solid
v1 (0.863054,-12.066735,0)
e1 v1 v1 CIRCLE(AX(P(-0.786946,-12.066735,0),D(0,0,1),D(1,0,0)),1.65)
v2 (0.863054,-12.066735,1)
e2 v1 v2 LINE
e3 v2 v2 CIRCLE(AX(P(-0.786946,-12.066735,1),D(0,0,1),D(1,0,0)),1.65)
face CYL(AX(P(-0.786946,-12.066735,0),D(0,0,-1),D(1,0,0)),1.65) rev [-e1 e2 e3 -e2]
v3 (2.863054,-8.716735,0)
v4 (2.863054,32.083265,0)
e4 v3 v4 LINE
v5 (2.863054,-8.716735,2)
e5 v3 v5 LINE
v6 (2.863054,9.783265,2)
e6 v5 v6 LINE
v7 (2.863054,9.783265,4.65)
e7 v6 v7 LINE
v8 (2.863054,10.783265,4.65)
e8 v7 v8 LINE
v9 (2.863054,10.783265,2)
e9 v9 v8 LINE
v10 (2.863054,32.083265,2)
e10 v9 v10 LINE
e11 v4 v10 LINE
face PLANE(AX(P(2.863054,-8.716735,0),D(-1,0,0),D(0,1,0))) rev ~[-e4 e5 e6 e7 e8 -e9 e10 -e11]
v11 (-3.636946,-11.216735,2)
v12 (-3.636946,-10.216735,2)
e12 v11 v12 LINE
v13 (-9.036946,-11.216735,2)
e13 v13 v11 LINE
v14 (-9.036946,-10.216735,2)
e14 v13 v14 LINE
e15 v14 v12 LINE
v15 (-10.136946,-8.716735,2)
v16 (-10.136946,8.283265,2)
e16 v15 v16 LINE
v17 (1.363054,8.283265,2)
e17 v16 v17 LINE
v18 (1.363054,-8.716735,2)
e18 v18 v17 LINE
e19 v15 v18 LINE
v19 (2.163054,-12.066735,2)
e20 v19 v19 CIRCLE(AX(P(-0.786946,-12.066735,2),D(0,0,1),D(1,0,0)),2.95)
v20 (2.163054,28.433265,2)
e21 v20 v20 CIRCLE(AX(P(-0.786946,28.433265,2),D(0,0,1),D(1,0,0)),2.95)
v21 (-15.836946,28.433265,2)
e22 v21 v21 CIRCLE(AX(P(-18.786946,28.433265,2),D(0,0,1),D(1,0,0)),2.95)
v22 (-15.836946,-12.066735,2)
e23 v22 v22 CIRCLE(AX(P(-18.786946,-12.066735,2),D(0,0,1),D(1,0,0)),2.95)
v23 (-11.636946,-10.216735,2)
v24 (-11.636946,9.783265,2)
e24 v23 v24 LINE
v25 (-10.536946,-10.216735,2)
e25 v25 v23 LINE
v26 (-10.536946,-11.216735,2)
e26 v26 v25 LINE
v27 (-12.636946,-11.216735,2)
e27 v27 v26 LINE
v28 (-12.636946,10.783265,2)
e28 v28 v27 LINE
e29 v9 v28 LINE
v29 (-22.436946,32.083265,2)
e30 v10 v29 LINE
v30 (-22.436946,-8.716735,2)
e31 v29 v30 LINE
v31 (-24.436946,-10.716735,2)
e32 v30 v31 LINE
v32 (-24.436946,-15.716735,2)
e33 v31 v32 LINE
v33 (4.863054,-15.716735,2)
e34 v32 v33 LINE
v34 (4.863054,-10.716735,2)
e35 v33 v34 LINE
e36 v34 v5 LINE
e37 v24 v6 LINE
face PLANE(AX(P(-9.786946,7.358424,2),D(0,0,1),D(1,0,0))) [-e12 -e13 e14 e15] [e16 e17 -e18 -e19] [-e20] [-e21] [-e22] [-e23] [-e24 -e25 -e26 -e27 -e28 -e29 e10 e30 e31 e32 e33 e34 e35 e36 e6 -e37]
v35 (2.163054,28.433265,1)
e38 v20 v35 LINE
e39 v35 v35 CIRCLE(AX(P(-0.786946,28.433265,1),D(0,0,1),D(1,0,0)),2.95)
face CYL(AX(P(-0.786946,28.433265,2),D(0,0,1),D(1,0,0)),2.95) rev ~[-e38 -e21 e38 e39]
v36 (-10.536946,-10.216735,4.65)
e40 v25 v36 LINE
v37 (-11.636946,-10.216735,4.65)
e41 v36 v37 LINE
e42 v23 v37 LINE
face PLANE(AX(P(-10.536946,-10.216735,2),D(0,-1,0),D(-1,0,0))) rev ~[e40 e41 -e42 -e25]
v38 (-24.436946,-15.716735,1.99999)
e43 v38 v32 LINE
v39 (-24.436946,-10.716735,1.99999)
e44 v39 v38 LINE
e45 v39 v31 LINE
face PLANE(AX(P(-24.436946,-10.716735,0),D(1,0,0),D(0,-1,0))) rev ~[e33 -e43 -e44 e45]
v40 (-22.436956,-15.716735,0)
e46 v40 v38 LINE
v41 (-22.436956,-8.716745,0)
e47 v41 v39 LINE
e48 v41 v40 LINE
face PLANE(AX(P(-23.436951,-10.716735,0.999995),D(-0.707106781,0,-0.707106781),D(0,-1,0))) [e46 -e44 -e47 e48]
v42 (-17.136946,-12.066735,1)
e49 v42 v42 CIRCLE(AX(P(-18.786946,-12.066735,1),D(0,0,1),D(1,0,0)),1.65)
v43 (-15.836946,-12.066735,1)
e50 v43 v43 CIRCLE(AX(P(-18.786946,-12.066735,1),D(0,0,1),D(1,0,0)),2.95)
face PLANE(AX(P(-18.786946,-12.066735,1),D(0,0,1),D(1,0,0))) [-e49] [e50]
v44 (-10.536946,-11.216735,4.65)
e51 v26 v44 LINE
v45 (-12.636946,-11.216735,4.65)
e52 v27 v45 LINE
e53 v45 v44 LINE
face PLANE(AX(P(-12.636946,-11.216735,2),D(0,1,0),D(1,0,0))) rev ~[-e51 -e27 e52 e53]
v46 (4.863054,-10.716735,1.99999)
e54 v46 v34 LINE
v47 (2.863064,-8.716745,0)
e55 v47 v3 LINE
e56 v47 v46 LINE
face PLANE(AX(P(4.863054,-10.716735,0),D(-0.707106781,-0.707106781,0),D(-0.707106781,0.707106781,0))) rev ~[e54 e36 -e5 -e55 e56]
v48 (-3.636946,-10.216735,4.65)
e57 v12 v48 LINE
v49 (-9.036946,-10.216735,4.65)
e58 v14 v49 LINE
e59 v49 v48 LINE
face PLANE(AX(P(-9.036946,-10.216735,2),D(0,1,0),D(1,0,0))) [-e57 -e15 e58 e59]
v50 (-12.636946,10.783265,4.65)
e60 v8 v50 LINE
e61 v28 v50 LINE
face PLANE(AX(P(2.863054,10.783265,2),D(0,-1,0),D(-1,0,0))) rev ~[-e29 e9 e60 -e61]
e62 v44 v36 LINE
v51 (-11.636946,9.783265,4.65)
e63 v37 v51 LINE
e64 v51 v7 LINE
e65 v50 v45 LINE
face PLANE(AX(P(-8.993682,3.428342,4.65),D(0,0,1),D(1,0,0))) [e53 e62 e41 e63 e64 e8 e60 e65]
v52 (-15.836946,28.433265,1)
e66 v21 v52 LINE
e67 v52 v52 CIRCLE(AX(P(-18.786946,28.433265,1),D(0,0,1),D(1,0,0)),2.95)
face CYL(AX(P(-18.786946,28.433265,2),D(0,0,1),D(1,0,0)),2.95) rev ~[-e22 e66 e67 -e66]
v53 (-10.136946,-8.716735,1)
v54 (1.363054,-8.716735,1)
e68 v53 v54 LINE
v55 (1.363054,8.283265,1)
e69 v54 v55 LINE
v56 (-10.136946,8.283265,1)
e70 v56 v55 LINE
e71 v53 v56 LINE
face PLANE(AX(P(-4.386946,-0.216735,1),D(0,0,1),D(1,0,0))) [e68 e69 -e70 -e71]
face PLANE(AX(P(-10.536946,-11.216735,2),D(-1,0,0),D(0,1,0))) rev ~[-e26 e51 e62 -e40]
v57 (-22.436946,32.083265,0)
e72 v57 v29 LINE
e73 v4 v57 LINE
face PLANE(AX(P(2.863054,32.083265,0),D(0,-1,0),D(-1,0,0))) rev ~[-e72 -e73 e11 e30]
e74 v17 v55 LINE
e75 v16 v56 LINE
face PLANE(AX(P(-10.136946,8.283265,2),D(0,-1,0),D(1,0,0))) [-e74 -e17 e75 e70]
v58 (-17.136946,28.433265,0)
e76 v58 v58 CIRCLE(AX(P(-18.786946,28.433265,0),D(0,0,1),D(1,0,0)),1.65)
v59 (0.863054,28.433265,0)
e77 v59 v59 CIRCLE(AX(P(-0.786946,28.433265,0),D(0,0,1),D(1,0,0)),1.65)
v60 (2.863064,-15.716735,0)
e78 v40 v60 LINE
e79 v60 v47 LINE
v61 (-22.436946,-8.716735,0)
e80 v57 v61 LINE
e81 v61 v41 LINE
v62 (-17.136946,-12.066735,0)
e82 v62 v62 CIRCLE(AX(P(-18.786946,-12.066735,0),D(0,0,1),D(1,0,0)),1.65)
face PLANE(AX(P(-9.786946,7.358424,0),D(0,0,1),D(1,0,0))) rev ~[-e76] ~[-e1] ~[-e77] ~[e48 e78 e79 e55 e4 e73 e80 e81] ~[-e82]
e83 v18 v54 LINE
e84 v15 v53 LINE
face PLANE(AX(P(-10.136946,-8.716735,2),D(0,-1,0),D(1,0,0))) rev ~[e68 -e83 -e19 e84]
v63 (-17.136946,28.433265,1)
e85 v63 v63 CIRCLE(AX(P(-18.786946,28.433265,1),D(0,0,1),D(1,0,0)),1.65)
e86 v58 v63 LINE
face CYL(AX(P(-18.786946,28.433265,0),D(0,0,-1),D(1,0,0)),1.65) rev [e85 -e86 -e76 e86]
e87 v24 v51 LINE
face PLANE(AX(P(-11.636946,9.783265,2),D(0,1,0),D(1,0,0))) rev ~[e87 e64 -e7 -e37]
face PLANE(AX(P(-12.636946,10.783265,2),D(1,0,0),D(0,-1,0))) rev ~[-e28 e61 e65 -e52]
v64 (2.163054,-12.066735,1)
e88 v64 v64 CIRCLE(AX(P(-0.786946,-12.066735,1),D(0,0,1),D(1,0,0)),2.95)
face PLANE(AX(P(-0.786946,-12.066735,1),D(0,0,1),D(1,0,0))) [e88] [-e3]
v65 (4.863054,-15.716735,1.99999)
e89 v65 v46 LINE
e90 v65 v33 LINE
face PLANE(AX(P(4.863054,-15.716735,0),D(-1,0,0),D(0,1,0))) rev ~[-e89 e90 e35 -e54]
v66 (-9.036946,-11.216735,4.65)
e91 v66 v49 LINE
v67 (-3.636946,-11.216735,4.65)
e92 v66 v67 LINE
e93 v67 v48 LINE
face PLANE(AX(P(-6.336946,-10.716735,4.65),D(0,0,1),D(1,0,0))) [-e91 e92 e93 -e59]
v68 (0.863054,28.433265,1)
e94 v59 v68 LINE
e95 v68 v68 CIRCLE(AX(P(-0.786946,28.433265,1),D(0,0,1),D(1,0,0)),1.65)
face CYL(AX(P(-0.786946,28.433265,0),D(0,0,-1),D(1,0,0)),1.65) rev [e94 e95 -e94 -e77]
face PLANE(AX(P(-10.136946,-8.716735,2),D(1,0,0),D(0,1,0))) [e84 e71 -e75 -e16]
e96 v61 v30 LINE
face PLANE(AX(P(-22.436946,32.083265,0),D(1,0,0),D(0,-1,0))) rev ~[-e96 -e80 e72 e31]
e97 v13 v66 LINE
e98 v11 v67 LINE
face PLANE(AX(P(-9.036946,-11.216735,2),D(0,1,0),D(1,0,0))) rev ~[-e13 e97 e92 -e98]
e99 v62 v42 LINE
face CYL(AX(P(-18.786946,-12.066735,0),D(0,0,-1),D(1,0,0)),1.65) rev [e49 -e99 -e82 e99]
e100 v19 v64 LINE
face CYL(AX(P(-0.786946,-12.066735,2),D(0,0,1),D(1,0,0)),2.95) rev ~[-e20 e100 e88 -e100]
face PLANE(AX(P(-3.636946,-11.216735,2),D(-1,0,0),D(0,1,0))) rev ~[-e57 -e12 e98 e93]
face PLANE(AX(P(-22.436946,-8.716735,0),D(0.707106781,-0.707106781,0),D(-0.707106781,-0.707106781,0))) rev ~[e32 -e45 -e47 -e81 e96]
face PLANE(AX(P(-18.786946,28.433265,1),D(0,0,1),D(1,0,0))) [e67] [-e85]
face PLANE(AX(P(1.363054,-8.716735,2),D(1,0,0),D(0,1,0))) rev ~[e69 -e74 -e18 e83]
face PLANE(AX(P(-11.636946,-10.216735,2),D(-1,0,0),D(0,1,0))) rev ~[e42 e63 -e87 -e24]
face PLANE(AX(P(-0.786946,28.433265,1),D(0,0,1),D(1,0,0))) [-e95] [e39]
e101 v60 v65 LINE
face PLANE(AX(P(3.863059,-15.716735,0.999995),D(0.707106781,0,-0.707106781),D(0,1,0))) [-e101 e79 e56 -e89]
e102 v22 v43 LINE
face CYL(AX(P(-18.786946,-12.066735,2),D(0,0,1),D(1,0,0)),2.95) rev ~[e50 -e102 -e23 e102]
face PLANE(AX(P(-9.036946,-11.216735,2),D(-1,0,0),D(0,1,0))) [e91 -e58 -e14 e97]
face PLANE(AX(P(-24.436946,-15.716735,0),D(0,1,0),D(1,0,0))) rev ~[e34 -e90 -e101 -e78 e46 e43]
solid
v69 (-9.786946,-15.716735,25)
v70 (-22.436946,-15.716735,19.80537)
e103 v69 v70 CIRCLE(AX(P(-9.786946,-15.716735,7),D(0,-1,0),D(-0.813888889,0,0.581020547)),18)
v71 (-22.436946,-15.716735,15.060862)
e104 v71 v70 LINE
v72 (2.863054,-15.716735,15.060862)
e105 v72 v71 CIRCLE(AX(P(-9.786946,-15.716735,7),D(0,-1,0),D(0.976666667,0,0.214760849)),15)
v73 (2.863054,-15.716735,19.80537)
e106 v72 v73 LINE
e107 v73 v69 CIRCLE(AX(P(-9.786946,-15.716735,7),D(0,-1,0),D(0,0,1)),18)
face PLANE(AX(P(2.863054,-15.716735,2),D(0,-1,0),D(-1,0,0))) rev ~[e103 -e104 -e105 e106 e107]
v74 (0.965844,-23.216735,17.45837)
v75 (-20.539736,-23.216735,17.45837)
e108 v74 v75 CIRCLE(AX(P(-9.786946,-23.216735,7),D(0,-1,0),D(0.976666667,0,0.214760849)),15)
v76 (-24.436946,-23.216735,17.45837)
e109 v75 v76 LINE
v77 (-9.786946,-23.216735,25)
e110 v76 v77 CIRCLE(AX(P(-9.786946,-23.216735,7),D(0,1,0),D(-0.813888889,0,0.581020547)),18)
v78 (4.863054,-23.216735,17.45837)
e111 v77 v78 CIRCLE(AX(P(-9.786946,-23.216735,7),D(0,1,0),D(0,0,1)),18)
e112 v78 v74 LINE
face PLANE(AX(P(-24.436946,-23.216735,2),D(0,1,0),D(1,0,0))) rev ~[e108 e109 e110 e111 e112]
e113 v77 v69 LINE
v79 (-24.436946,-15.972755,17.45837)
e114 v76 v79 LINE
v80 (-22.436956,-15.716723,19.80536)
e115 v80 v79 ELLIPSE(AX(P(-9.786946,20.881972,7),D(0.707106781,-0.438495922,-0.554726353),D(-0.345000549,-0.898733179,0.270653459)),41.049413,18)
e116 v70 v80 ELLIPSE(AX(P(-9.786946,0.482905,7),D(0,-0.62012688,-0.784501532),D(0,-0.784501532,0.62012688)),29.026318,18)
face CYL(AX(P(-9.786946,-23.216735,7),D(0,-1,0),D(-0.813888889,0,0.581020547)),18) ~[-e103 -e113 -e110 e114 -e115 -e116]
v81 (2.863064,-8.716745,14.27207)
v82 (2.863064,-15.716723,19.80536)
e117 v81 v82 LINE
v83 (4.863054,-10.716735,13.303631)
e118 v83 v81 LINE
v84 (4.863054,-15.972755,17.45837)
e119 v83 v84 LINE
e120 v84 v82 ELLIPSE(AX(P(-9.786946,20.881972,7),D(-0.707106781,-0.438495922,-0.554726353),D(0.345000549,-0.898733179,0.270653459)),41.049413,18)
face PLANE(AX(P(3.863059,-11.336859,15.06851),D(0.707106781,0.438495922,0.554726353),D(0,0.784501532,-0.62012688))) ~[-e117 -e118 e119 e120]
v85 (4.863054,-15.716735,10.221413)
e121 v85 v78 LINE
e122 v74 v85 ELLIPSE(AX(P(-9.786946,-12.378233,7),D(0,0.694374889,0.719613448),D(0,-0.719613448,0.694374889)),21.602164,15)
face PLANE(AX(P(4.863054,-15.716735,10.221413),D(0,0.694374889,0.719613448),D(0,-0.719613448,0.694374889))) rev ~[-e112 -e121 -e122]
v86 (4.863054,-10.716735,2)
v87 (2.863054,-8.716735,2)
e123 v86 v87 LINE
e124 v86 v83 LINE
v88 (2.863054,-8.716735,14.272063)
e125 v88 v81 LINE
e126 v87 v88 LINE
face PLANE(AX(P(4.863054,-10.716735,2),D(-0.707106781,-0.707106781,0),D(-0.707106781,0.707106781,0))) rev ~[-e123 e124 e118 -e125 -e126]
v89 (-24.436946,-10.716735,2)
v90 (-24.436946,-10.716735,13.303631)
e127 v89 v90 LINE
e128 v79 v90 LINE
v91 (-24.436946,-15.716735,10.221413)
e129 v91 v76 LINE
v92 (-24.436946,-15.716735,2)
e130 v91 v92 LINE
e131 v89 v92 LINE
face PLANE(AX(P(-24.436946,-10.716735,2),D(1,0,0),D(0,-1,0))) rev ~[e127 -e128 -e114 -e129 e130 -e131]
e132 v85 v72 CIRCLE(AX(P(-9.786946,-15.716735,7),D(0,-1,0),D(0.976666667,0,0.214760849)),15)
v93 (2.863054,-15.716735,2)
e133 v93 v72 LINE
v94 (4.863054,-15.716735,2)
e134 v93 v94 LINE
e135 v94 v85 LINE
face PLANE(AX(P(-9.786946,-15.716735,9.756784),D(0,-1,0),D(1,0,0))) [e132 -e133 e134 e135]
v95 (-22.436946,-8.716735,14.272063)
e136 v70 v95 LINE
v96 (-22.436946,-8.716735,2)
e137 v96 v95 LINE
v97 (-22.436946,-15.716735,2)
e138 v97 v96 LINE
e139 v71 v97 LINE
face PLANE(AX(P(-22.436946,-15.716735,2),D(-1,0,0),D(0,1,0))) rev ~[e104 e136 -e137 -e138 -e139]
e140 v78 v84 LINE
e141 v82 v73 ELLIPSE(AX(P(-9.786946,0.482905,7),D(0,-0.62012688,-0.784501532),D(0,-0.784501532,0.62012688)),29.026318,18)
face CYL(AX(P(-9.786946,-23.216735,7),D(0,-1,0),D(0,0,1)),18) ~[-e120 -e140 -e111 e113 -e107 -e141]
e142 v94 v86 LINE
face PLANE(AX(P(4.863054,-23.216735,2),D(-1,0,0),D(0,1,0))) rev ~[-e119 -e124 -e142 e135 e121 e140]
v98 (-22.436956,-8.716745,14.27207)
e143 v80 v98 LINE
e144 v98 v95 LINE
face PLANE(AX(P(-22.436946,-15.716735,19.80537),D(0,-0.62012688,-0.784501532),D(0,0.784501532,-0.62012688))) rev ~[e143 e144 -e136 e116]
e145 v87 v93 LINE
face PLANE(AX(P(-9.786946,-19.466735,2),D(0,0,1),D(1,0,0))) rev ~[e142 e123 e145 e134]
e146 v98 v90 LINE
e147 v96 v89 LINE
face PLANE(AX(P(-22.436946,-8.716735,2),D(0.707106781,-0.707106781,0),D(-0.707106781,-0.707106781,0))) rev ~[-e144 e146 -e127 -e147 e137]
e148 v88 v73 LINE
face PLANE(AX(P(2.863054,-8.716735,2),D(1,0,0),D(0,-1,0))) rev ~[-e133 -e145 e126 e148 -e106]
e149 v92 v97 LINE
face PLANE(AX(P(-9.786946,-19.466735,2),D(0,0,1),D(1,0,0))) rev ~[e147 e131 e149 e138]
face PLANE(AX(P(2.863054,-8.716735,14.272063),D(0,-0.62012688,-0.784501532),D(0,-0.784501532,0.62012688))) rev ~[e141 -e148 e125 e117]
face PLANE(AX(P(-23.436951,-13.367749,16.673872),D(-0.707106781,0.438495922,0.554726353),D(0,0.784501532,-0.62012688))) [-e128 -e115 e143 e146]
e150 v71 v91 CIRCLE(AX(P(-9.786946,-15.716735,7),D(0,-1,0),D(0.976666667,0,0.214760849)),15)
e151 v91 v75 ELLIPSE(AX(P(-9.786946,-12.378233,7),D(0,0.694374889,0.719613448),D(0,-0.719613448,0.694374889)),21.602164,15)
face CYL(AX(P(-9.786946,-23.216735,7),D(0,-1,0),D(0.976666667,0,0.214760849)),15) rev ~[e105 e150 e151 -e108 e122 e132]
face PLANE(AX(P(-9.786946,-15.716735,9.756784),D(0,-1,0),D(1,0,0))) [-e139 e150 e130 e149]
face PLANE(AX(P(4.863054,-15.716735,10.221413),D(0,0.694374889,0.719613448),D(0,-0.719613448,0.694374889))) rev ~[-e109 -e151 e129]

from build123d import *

# Parameters (mm, degrees)
F0_R      = 1.65
F1_DEPTH  = 2
F2_R      = 2.95
F2_R_2    = 1.65
F2_W      = 11.5
F2_H      = 17
F3_DEPTH  = 1
F4_W      = 5.4
F4_H      = 1
F5_DEPTH  = 2.65
F7_DEPTH  = 23
F9_DEPTH  = 7.5
F10_DEPTH = 55.301
F12_DEPTH = 29.301
F13_SIZE  = 1.99999
F15_DEPTH = 2.001
F17_DEPTH = 2.001
F18_SIZE  = 1.99999


# Not quite as in the source:
# - a fillet or chamfer is up to 0.001 mm smaller than in the source, because OpenCascade refuses the exact size


with BuildPart() as f1:
    # F0 (on Top) → F1 (new body)
    with BuildSketch(Plane.XY):
        Polygon((2.8630541071, 32.0832646102), (-22.4369458929, 32.0832646102), (-22.4369458929, -8.7167353898), (-24.4369458929, -10.7167353898), (-24.4369458929, -15.7167353898), (-21.1369458929, -15.7167353898), (2.8630541071, -15.7167353898), (4.8630541071, -15.7167353898), (4.8630541071, -10.7167353898), (2.8630541071, -8.7167353898), align=None)
        with Locations((-18.7869458929, -12.0667353898)):
            Circle(F0_R, mode=Mode.SUBTRACT)
        with Locations((-0.7869458929, -12.0667353898)):
            Circle(F0_R, mode=Mode.SUBTRACT)
        with Locations((-18.7869458929, 28.4332646102)):
            Circle(F0_R, mode=Mode.SUBTRACT)
        with Locations((-0.7869458929, 28.4332646102)):
            Circle(F0_R, mode=Mode.SUBTRACT)
    extrude(amount=F1_DEPTH)

    # F2 (on face) → F3 (cut)
    with BuildSketch(Plane.XY.offset(2)):
        with Locations((-18.7869458929, -12.0667353898)):
            Circle(F2_R)
        with Locations((-18.7869458929, -12.0667353898)):
            Circle(F2_R_2, mode=Mode.SUBTRACT)
        with Locations((-0.7869458929, -12.0667353898)):
            Circle(F2_R)
        with Locations((-0.7869458929, -12.0667353898)):
            Circle(F2_R_2, mode=Mode.SUBTRACT)
        with Locations((-18.7869458929, 28.4332646102)):
            Circle(F2_R)
        with Locations((-18.7869458929, 28.4332646102)):
            Circle(F2_R_2, mode=Mode.SUBTRACT)
        with Locations((-0.7869458929, 28.4332646102)):
            Circle(F2_R)
        with Locations((-0.7869458929, 28.4332646102)):
            Circle(F2_R_2, mode=Mode.SUBTRACT)
        with Locations((-4.3869458929, -0.2167353898)):
            Rectangle(F2_W, F2_H)
    extrude(amount=-F3_DEPTH, mode=Mode.SUBTRACT)

    # F4 (on face) → F5 (join)
    with BuildSketch(Plane.XY.offset(2)):
        Polygon((-10.5369458929, -11.2167353898), (-10.5369458929, -10.2167353898), (-11.6369458929, -10.2167353898), (-11.6369458929, 9.7832646102), (2.8630541071, 9.7832646102), (2.8630541071, 10.7832646102), (-12.6369458929, 10.7832646102), (-12.6369458929, -11.2167353898), align=None)
        with Locations((-6.3369458929, -10.7167353898)):
            Rectangle(F4_W, F4_H)
    extrude(amount=F5_DEPTH)

    # F13 (size 2 in the source; OpenCascade refuses exactly that, so slightly less here)
    f13_edges = [f1.edges().sort_by_distance(p)[0] for p in [
        (4.863054, -13.216735, 0),
        (-24.436946, -13.216735, 0),
    ]]
    chamfer(f13_edges, length=F13_SIZE)


with BuildPart() as f7:
    # F6 (on face) → F7 (new body)
    with BuildSketch(Plane.XY.offset(2)):
        Polygon((4.8630541071, -15.7167353898), (2.8630541071, -15.7167353898), (-22.4369458929, -15.7167353898), (-24.4369458929, -15.7167353898), (-24.4369458929, -23.2167353898), (4.8630541071, -23.2167353898), align=None)
        Polygon((4.8630541071, -10.7167353898), (2.8630541071, -8.7167353898), (2.8630541071, -15.7167353898), (4.8630541071, -15.7167353898), align=None)
        Polygon((-24.4369458929, -15.7167353898), (-22.4369458929, -15.7167353898), (-22.4369458929, -8.7167353898), (-24.4369458929, -10.7167353898), align=None)
    extrude(amount=F7_DEPTH)

    # F8 (on face) → F9 (cut)
    with BuildSketch(Plane.XZ.offset(23.2167353898)):
        with BuildLine():
            Line((4.8630541071, 2), (4.8630541071, 10.2214127336))
            ThreePointArc((4.8630541071, 10.2214127336), (-9.7869458929, 22), (-24.4369458929, 10.2214127336))
            Line((-24.4369458929, 10.2214127336), (-24.4369458929, 2))
            Line((-24.4369458929, 2), (4.8630541071, 2))
        make_face()
    extrude(amount=-F9_DEPTH, mode=Mode.SUBTRACT)

    # F8 (on face) → F10 (cut, through all)
    with BuildSketch(Plane.XZ.offset(23.2167353898)):
        with BuildLine():
            Line((-24.4369458929, 25), (-24.4369458929, 17.4583698539))
            ThreePointArc((-24.4369458929, 17.4583698539), (-18.0255544717, 23.0039160422), (-9.7869458929, 25))
            Line((-9.7869458929, 25), (-24.4369458929, 25))
        make_face()
        with BuildLine():
            ThreePointArc((-9.7869458929, 25), (-1.548337314, 23.0039160422), (4.8630541071, 17.4583698539))
            Line((4.8630541071, 17.4583698539), (4.8630541071, 25))
            Line((4.8630541071, 25), (-9.7869458929, 25))
        make_face()
    extrude(amount=-F10_DEPTH, mode=Mode.SUBTRACT)

    # F11 (on face) → F12 (cut, through all)
    with BuildSketch(Plane.YZ.offset(4.8630541071)):
        Polygon((-23.2167353898, 10.2214127336), (-15.7167353898, 10.2214127336), (-23.2167353898, 17.4583698539), align=None)
    extrude(amount=-F12_DEPTH, mode=Mode.SUBTRACT)

    # F14 (on face) → F15 (cut, through all)
    with BuildSketch(Plane.YZ.offset(-22.4369458929)):
        Polygon((-8.7167353898, 19.8053699673), (-15.7167353898, 19.8053699673), (-8.7167353898, 14.2720625306), align=None)
    extrude(amount=-F15_DEPTH, mode=Mode.SUBTRACT)

    # F16 (on face) → F17 (cut, through all)
    with BuildSketch(Plane(origin=(2.8630541071, 0, 0), x_dir=(0, -1, 0), z_dir=(-1, 0, 0))):
        Polygon((15.7167353898, 19.8053699673), (8.7167353898, 19.8053699673), (8.7167353898, 14.2720625306), align=None)
    extrude(amount=-F17_DEPTH, mode=Mode.SUBTRACT)

    # F18 (size 2 in the source; OpenCascade refuses exactly that, so slightly less here)
    f18_edges = [f7.edges().sort_by_distance(p)[0] for p in [
        (-24.436946, -11.73218, 16.655689),
        (4.863054, -11.73218, 16.655689),
    ]]
    chamfer(f18_edges, length=F18_SIZE)


solid = Compound([f1.part, f7.part])
